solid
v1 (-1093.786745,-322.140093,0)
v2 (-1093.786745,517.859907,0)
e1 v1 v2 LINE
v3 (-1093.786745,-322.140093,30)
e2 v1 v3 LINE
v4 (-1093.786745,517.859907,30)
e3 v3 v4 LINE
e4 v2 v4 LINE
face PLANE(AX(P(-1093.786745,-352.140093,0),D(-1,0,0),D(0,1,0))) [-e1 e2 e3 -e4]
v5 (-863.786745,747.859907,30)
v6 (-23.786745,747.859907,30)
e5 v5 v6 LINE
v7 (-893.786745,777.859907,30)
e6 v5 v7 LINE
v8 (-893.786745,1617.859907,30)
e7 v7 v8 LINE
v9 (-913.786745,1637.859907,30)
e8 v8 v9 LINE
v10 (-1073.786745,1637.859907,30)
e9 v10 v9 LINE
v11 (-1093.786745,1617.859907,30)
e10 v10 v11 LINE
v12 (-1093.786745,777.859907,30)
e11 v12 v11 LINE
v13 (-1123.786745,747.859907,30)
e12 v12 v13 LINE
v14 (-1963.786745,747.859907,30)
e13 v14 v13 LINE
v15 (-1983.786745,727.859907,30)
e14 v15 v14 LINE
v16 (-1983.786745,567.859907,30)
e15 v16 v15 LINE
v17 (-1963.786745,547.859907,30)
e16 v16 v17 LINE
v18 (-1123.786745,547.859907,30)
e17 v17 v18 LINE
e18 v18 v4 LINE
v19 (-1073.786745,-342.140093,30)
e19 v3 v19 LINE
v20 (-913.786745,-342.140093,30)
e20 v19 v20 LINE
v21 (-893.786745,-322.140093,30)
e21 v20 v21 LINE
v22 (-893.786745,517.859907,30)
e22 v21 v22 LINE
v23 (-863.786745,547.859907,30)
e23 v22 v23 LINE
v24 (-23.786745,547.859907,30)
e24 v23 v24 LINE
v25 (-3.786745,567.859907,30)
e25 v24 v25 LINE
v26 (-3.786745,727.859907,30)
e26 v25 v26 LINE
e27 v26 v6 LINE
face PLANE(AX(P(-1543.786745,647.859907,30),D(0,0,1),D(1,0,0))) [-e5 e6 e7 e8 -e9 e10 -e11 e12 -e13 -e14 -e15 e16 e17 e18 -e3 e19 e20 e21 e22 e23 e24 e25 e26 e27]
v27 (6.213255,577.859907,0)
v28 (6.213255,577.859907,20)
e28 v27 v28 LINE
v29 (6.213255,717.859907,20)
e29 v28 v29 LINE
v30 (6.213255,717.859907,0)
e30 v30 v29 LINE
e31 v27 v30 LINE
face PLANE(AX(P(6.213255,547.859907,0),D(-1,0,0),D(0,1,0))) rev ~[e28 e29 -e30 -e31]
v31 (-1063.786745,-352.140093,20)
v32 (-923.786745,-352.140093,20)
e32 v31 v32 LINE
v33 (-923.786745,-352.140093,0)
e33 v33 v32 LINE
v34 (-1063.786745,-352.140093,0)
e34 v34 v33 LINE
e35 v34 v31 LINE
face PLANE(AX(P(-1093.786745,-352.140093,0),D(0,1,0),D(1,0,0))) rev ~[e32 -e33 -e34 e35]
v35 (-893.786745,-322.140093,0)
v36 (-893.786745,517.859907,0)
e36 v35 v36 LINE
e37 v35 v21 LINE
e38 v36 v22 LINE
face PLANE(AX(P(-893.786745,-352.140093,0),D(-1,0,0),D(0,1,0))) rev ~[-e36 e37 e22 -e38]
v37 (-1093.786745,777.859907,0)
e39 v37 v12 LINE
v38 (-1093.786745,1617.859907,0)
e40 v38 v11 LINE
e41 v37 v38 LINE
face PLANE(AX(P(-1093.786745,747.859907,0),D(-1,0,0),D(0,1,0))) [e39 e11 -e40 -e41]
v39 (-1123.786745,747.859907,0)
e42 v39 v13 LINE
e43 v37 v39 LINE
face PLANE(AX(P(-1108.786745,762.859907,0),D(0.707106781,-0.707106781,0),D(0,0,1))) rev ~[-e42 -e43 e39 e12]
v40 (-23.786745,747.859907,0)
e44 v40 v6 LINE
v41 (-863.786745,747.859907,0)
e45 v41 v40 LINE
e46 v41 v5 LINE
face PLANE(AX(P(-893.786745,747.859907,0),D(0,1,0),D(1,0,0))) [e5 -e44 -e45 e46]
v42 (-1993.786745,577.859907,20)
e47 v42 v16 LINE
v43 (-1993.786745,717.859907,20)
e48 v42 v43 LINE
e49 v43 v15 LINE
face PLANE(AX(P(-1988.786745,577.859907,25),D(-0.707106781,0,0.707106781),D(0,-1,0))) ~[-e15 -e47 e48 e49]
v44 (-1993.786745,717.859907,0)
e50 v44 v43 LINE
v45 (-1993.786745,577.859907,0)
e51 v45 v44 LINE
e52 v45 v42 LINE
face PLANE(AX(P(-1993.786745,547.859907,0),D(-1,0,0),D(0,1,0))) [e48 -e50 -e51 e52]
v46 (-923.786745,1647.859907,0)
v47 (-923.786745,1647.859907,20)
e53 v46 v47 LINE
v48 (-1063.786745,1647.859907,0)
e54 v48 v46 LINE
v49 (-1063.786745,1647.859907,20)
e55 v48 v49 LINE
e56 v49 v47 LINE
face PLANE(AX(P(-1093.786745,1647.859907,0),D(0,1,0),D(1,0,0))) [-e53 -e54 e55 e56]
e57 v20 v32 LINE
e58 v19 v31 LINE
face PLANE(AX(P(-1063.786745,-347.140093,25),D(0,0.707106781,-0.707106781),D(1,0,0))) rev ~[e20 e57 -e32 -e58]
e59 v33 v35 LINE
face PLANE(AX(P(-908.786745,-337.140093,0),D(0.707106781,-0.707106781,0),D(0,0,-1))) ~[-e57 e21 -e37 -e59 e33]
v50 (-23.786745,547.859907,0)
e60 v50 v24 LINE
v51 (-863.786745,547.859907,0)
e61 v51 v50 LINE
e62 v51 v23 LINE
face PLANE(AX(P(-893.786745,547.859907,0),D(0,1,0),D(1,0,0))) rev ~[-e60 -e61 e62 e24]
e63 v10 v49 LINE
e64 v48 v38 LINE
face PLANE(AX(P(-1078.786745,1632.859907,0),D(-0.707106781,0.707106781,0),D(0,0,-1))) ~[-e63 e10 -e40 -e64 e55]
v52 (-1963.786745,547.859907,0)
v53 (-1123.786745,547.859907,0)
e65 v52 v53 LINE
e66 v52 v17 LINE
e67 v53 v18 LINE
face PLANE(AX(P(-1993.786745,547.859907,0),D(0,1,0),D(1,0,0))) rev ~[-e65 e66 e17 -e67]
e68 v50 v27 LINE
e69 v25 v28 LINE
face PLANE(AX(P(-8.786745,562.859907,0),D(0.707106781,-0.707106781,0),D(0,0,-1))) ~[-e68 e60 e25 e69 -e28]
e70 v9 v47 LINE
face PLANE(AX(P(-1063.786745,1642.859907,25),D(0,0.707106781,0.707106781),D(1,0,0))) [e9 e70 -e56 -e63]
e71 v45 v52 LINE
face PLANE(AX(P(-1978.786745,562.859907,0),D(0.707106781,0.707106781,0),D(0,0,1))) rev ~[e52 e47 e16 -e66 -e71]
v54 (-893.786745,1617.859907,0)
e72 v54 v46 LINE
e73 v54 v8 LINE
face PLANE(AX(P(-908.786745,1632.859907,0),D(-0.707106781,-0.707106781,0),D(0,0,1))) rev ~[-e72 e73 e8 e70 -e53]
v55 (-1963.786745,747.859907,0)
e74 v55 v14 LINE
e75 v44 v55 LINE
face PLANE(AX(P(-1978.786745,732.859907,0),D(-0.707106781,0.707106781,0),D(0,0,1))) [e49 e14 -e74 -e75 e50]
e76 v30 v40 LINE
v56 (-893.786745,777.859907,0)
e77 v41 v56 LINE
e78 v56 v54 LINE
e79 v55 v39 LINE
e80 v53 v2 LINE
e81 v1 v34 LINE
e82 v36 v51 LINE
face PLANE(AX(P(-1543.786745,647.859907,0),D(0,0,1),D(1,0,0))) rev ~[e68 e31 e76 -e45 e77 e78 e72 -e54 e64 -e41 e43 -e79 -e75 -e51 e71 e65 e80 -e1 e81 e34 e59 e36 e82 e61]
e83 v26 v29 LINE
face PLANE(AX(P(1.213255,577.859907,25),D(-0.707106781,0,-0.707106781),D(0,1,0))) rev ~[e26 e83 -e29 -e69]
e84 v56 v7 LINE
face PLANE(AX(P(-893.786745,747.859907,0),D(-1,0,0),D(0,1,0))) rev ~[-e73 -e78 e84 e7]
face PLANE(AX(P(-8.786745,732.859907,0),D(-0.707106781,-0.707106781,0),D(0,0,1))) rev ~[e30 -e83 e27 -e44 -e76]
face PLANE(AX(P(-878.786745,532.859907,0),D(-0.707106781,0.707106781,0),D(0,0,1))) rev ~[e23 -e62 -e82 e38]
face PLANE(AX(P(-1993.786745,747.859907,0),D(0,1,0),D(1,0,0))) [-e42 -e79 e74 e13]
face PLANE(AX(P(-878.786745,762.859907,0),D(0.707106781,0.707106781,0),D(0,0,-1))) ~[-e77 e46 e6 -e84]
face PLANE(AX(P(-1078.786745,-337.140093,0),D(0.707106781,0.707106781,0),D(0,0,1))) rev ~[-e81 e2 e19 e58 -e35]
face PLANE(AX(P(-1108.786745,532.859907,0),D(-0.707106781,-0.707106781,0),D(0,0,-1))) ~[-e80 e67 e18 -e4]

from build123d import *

# Parameters (mm, degrees)
F0_W     = 900
F0_H     = 200
F0_W_2   = 200
F0_H_2   = 900
F1_DEPTH = 30
F2_SIZE  = 30
F3_SIZE  = 10


with BuildPart() as f1:
    # F0 (on Top) → F1 (new body)
    with BuildSketch(Plane.XY):
        with Locations((-1543.7867450795, 647.8599071422)):
            Rectangle(F0_W, F0_H)
        with Locations((-993.7867450795, 1197.8599071422)):
            Rectangle(F0_W_2, F0_H_2)
        with Locations((-993.7867450795, 647.8599071422)):
            Rectangle(F0_W_2, F0_H)
        with Locations((-443.7867450795, 647.8599071422)):
            Rectangle(F0_W, F0_H)
        with Locations((-993.7867450795, 97.8599071422)):
            Rectangle(F0_W_2, F0_H_2)
    extrude(amount=F1_DEPTH)

    # F2
    f2_edges = [f1.edges().sort_by_distance(p)[0] for p in [
        (-1093.786745, 747.859907, 15),
        (-1993.786745, 747.859907, 15),
        (-1993.786745, 547.859907, 15),
        (-1093.786745, 547.859907, 15),
        (-1093.786745, -352.140093, 15),
        (-893.786745, -352.140093, 15),
        (-893.786745, 547.859907, 15),
        (6.213255, 547.859907, 15),
        (6.213255, 747.859907, 15),
        (-893.786745, 747.859907, 15),
        (-893.786745, 1647.859907, 15),
        (-1093.786745, 1647.859907, 15),
    ]]
    chamfer(f2_edges, length=F2_SIZE)

    # F3
    f3_edges = [f1.edges().sort_by_distance(p)[0] for p in [
        (-993.786745, -352.140093, 30),
        (6.213255, 647.859907, 30),
        (-993.786745, 1647.859907, 30),
        (-1993.786745, 647.859907, 30),
    ]]
    chamfer(f3_edges, length=F3_SIZE)


solid = f1.part
